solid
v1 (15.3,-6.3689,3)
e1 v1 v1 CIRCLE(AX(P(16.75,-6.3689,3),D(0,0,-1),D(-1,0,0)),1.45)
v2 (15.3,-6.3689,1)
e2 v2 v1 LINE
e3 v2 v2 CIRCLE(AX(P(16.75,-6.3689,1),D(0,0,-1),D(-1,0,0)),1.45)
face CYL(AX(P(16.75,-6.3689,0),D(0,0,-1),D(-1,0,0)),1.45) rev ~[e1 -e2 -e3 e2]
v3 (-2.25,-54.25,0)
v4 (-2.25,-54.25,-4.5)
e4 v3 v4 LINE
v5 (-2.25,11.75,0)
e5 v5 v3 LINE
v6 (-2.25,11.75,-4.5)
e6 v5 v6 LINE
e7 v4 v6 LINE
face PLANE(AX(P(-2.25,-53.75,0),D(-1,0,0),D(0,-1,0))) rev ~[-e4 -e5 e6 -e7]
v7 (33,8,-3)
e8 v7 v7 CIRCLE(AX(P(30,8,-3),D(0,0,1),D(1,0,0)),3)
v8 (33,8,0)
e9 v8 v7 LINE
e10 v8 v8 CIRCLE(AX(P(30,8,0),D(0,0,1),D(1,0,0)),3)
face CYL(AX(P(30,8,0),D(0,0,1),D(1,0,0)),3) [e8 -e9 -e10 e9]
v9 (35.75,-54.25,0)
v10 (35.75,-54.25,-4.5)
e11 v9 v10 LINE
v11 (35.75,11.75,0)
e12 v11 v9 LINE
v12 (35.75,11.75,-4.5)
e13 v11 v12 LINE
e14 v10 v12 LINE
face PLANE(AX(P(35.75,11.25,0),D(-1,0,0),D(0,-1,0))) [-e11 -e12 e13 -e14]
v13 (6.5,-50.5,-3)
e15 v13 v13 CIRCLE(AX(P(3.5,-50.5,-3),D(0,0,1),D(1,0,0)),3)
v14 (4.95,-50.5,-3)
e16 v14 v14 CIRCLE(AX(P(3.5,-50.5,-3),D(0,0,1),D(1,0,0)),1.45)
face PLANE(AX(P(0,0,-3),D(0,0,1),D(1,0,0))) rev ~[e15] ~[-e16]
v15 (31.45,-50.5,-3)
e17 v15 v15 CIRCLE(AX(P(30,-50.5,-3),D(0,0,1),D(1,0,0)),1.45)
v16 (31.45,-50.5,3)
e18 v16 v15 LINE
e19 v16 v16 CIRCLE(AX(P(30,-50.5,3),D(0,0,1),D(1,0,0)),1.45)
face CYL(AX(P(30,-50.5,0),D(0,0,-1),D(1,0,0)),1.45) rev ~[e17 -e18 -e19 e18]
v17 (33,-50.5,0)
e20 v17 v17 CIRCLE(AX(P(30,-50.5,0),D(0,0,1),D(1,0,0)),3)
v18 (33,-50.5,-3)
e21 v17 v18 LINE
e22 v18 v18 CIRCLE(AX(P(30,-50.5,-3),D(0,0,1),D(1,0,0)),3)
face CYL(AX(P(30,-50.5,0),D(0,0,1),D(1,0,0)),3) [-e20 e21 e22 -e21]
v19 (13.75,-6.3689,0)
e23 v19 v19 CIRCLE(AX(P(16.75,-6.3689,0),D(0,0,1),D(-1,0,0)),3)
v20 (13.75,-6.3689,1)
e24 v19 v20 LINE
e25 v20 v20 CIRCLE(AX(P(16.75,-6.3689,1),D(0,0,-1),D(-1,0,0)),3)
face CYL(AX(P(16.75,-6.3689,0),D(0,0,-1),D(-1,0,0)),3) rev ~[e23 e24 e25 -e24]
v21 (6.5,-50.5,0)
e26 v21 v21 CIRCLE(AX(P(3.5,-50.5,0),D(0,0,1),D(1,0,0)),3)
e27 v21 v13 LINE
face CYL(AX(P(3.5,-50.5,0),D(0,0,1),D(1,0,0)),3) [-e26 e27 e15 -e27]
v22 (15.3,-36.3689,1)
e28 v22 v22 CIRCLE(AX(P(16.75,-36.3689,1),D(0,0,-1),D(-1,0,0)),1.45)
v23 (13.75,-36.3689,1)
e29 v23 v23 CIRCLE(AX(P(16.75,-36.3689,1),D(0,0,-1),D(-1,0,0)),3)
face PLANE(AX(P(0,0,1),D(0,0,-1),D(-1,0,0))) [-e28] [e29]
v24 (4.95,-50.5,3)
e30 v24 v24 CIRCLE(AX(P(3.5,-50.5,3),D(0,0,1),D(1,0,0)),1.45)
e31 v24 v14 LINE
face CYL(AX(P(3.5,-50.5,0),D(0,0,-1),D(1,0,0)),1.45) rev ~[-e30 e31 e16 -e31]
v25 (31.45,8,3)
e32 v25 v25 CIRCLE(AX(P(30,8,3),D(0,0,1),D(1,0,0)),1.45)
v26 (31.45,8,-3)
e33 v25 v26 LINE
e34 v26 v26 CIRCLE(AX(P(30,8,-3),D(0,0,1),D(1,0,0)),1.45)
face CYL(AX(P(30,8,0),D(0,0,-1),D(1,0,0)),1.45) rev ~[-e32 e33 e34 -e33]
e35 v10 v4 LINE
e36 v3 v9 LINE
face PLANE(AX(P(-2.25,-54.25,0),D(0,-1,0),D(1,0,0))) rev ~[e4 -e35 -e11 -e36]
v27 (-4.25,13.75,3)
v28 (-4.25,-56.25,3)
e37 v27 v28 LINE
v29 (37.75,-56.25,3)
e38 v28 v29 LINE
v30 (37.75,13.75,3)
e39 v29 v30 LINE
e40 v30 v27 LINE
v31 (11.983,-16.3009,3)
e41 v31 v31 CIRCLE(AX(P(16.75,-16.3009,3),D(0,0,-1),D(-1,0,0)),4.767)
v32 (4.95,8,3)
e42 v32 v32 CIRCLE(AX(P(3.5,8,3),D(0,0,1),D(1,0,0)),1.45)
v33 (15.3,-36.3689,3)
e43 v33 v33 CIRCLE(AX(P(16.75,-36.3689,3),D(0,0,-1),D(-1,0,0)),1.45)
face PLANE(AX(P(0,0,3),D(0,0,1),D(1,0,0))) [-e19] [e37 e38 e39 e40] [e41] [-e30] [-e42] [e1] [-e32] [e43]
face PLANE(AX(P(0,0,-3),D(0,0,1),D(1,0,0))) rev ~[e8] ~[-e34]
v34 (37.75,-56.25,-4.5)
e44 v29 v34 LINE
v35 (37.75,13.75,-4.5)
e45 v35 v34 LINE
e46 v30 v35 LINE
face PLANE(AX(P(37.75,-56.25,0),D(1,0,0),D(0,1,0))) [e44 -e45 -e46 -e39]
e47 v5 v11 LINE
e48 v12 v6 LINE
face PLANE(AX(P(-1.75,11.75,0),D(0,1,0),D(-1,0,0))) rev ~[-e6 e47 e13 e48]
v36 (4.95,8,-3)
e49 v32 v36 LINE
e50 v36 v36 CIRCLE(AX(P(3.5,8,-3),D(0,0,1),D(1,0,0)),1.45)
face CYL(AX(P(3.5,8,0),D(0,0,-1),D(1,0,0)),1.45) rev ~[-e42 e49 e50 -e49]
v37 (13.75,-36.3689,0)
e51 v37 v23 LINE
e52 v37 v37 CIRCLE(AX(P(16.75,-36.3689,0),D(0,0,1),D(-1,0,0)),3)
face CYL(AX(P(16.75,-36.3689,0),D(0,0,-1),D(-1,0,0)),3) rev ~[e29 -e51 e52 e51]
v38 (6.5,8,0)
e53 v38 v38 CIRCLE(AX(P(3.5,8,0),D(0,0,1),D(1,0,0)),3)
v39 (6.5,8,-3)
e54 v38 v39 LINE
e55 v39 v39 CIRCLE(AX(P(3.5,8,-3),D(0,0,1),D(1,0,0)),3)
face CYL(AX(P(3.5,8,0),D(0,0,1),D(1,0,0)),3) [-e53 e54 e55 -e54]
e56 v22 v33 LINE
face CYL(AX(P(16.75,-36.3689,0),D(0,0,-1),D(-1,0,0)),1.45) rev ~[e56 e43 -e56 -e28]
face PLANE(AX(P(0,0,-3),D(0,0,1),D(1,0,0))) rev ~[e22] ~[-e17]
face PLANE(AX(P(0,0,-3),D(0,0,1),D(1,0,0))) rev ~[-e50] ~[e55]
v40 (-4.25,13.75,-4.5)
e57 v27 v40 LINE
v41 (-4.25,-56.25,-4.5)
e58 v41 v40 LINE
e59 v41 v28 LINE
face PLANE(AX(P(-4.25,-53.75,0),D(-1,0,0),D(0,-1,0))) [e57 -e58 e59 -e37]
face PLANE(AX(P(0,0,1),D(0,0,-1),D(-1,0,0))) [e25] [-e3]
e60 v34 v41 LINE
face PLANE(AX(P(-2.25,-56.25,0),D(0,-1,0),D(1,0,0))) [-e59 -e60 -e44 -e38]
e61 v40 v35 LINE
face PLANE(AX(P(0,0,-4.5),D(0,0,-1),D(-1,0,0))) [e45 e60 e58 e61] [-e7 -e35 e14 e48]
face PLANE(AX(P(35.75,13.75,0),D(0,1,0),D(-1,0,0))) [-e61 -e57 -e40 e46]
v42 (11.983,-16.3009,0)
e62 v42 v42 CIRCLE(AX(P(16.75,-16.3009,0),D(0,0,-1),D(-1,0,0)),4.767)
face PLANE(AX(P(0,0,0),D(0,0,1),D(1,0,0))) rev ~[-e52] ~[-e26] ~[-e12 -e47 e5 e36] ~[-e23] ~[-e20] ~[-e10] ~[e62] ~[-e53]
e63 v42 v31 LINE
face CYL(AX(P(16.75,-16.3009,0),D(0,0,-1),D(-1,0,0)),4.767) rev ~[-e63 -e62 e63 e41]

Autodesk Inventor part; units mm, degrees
ref_plane "YZ Plane" through (0, 0, 0) normal (1, 0, 0) x (0, 1, 0)
ref_plane "XZ Plane" through (0, 0, 0) normal (0, 1, 0) x (-1, 0, 0)
ref_plane "XY Plane" through (0, 0, 0) normal (0, 0, 1) x (1, 0, 0)
sketch "Sketch1" plane through (0, 0, 0) normal (0, 0, 1) x (1, 0, 0)
  line L0 (-1.75, -53.75) -> (-1.75, 11.25) projected
  line L1 (35.25, -53.75) -> (-1.75, -53.75) projected
  line L2 (35.25, 11.25) -> (35.25, -53.75) projected
  line L3 (-1.75, 11.25) -> (35.25, 11.25) projected
  circle A0 centre (30, 8) radius 3 projected
  circle A1 centre (3.5, -50.5) radius 3 projected
  circle A2 centre (30, -50.5) radius 3 projected
  circle A3 centre (3.5, 8) radius 3 projected
  circle A4 centre (3.5, -50.5) radius 1.45
  circle A5 centre (30, -50.5) radius 1.45
  circle A6 centre (30, 8) radius 1.45
  circle A7 centre (3.5, 8) radius 1.45
  point P0 (0, 0)
  dimension "d0" = 2.9
  dimension "d1" = 2.9
  dimension "d2" = 2.9
  dimension "d3" = 2.9
extrude "Extrusion1" add sketch "Sketch1" along normal blind 3 contours L0 L3 L2 L1 | A0 | A1 | A2 | A3
sketch "Sketch2" plane through (0, 0, 0) normal (0, 0, -1) x (-1, 0, 0)
  line L0 (-35.25, -53.75) -> (-35.25, 11.25) projected
  line L1 (-35.25, 11.25) -> (-35.75, 11.25)
  line L2 (-35.75, 11.25) -> (-37.75, 11.25)
  line L3 (-37.75, 11.25) -> (-37.75, 11.75)
  line L4 (-37.75, 11.75) -> (-37.75, 13.75)
  line L5 (-37.75, 13.75) -> (1.75, 13.75)
  line L6 (1.75, 13.75) -> (2.25, 13.75)
  line L7 (2.25, 13.75) -> (4.25, 13.75)
  line L8 (4.25, 13.75) -> (4.25, -53.75)
  line L9 (4.25, -53.75) -> (4.25, -54.25)
  line L10 (4.25, -54.25) -> (4.25, -56.25)
  line L11 (4.25, -56.25) -> (-35.25, -56.25)
  line L12 (-35.25, -56.25) -> (-37.75, -56.25)
  line L13 (-37.75, -56.25) -> (-37.75, 11.25)
  line L14 (-37.75, 11.75) -> (4.25, 11.75)
  line L15 (1.75, 11.25) -> (1.75, -53.75) projected
  line L16 (1.75, 11.25) -> (1.75, 11.75)
  line L17 (2.25, 13.75) -> (2.25, -56.25)
  line L18 (1.75, -53.75) -> (4.25, -53.75)
  line L19 (4.25, -54.25) -> (-35.25, -54.25)
  line L20 (1.75, -53.75) -> (-35.25, -53.75) projected
  line L21 (-35.25, -54.25) -> (-37.75, -54.25)
  line L22 (-35.25, -53.75) -> (-35.25, -54.25)
  line L23 (-35.75, 11.25) -> (-35.75, -56.25)
  line L24 (-35.25, 11.25) -> (1.75, 11.25) projected
  line L25 (-35.75, 11.25) -> (-35.75, 13.75)
  point P0 (0, 0)
  point P1 (-35.75, -54.25)
  point P2 (-35.75, 11.75)
  point P3 (2.25, 11.75)
  point P4 (2.25, -54.25)
  dimension "d6" = 0.5
  dimension "d7" = 2
  dimension "d8" = 0.5
  dimension "d9" = 2
  dimension "d10" = 0.5
  dimension "d11" = 2
  dimension "d12" = 0.5
  dimension "d13" = 2
extrude "Extrusion2" add sketch "Sketch2" against normal up to surface (3 mm away) contours L22 L21 L23 L1 L0 | L20 L18 L17 L19 L22 | L1 L25 L14 L16 L24 | L15 L16 L14 L17 L18 | L19 L17 L11 L12 L23 L21 | L23 L21 L13 L2 | L2 L3 L14 L25 | L18 L9 L19 L17 | L17 L14 L8 L18 | L19 L10 L11 L17 | L23 L12 L13 L21 | L25 L5 L6 L17 L14 | L14 L4 L5 L25 | L17 L7 L8 L14
extrude "Extrusion3" add sketch "Sketch1" against normal blind 3 contours A0 | A1 | A2 | A3
extrude "Extrusion4" add sketch "Sketch2" along normal blind 4.5 contours L19 L17 L11 L12 L23 L21 | L23 L21 L13 L2 | L2 L3 L14 L25 | L18 L9 L19 L17 | L17 L14 L8 L18 | L19 L10 L11 L17 | L23 L12 L13 L21 | L25 L5 L6 L17 L14 | L14 L4 L5 L25 | L17 L7 L8 L14
sketch "Sketch3" plane through (0, 0, 0) normal (0, 0, -1) x (-1, 0, 0)
  line L0 (-35.75, 11.75) -> (2.25, 11.75) projected
  line L1 (-16.75, 11.75) -> (-16.75, -54.25)
  line L2 (2.25, -54.25) -> (-35.75, -54.25) projected
  circle A0 centre (-16.75, -6.3689) radius 1.45
  circle A1 centre (-16.75, -6.3689) radius 3
  line L3 (-16.75, -6.3689) -> (-16.75, -36.3689)
  circle A2 centre (-16.75, -36.3689) radius 1.45
  circle A3 centre (-16.75, -36.3689) radius 3
  point P0 (0, 0)
  dimension "d20" = 2.9
  dimension "d21" = 6
  dimension "d22" = 30
  dimension "d23" = 2.9
  dimension "d24" = 6
extrude "Extrusion5" cut sketch "Sketch3" against normal up to surface (3 mm away) contours A0 L1 | L1 A0 | A2 L1 | L1 A2
extrude "Extrusion6" cut sketch "Sketch3" against normal blind 1 contours A1 L1 A0 | L1 A0 A1 | A3 L1 A2 | L1 A2 A3
sketch "Sketch4" plane through (0, 0, 0) normal (0, 0, -1) x (-1, 0, 0)
  circle A0 centre (-16.75, -16.3009) radius 4.767
  point P0 (0, 0)
  point P1 (-16.75, -6.3689)
  dimension "d30" = 9.534
extrude "Extrusion7" cut sketch "Sketch4" against normal up to surface (3 mm away)
equation "\"d14\" = d7"
properties part number "converter_case"
